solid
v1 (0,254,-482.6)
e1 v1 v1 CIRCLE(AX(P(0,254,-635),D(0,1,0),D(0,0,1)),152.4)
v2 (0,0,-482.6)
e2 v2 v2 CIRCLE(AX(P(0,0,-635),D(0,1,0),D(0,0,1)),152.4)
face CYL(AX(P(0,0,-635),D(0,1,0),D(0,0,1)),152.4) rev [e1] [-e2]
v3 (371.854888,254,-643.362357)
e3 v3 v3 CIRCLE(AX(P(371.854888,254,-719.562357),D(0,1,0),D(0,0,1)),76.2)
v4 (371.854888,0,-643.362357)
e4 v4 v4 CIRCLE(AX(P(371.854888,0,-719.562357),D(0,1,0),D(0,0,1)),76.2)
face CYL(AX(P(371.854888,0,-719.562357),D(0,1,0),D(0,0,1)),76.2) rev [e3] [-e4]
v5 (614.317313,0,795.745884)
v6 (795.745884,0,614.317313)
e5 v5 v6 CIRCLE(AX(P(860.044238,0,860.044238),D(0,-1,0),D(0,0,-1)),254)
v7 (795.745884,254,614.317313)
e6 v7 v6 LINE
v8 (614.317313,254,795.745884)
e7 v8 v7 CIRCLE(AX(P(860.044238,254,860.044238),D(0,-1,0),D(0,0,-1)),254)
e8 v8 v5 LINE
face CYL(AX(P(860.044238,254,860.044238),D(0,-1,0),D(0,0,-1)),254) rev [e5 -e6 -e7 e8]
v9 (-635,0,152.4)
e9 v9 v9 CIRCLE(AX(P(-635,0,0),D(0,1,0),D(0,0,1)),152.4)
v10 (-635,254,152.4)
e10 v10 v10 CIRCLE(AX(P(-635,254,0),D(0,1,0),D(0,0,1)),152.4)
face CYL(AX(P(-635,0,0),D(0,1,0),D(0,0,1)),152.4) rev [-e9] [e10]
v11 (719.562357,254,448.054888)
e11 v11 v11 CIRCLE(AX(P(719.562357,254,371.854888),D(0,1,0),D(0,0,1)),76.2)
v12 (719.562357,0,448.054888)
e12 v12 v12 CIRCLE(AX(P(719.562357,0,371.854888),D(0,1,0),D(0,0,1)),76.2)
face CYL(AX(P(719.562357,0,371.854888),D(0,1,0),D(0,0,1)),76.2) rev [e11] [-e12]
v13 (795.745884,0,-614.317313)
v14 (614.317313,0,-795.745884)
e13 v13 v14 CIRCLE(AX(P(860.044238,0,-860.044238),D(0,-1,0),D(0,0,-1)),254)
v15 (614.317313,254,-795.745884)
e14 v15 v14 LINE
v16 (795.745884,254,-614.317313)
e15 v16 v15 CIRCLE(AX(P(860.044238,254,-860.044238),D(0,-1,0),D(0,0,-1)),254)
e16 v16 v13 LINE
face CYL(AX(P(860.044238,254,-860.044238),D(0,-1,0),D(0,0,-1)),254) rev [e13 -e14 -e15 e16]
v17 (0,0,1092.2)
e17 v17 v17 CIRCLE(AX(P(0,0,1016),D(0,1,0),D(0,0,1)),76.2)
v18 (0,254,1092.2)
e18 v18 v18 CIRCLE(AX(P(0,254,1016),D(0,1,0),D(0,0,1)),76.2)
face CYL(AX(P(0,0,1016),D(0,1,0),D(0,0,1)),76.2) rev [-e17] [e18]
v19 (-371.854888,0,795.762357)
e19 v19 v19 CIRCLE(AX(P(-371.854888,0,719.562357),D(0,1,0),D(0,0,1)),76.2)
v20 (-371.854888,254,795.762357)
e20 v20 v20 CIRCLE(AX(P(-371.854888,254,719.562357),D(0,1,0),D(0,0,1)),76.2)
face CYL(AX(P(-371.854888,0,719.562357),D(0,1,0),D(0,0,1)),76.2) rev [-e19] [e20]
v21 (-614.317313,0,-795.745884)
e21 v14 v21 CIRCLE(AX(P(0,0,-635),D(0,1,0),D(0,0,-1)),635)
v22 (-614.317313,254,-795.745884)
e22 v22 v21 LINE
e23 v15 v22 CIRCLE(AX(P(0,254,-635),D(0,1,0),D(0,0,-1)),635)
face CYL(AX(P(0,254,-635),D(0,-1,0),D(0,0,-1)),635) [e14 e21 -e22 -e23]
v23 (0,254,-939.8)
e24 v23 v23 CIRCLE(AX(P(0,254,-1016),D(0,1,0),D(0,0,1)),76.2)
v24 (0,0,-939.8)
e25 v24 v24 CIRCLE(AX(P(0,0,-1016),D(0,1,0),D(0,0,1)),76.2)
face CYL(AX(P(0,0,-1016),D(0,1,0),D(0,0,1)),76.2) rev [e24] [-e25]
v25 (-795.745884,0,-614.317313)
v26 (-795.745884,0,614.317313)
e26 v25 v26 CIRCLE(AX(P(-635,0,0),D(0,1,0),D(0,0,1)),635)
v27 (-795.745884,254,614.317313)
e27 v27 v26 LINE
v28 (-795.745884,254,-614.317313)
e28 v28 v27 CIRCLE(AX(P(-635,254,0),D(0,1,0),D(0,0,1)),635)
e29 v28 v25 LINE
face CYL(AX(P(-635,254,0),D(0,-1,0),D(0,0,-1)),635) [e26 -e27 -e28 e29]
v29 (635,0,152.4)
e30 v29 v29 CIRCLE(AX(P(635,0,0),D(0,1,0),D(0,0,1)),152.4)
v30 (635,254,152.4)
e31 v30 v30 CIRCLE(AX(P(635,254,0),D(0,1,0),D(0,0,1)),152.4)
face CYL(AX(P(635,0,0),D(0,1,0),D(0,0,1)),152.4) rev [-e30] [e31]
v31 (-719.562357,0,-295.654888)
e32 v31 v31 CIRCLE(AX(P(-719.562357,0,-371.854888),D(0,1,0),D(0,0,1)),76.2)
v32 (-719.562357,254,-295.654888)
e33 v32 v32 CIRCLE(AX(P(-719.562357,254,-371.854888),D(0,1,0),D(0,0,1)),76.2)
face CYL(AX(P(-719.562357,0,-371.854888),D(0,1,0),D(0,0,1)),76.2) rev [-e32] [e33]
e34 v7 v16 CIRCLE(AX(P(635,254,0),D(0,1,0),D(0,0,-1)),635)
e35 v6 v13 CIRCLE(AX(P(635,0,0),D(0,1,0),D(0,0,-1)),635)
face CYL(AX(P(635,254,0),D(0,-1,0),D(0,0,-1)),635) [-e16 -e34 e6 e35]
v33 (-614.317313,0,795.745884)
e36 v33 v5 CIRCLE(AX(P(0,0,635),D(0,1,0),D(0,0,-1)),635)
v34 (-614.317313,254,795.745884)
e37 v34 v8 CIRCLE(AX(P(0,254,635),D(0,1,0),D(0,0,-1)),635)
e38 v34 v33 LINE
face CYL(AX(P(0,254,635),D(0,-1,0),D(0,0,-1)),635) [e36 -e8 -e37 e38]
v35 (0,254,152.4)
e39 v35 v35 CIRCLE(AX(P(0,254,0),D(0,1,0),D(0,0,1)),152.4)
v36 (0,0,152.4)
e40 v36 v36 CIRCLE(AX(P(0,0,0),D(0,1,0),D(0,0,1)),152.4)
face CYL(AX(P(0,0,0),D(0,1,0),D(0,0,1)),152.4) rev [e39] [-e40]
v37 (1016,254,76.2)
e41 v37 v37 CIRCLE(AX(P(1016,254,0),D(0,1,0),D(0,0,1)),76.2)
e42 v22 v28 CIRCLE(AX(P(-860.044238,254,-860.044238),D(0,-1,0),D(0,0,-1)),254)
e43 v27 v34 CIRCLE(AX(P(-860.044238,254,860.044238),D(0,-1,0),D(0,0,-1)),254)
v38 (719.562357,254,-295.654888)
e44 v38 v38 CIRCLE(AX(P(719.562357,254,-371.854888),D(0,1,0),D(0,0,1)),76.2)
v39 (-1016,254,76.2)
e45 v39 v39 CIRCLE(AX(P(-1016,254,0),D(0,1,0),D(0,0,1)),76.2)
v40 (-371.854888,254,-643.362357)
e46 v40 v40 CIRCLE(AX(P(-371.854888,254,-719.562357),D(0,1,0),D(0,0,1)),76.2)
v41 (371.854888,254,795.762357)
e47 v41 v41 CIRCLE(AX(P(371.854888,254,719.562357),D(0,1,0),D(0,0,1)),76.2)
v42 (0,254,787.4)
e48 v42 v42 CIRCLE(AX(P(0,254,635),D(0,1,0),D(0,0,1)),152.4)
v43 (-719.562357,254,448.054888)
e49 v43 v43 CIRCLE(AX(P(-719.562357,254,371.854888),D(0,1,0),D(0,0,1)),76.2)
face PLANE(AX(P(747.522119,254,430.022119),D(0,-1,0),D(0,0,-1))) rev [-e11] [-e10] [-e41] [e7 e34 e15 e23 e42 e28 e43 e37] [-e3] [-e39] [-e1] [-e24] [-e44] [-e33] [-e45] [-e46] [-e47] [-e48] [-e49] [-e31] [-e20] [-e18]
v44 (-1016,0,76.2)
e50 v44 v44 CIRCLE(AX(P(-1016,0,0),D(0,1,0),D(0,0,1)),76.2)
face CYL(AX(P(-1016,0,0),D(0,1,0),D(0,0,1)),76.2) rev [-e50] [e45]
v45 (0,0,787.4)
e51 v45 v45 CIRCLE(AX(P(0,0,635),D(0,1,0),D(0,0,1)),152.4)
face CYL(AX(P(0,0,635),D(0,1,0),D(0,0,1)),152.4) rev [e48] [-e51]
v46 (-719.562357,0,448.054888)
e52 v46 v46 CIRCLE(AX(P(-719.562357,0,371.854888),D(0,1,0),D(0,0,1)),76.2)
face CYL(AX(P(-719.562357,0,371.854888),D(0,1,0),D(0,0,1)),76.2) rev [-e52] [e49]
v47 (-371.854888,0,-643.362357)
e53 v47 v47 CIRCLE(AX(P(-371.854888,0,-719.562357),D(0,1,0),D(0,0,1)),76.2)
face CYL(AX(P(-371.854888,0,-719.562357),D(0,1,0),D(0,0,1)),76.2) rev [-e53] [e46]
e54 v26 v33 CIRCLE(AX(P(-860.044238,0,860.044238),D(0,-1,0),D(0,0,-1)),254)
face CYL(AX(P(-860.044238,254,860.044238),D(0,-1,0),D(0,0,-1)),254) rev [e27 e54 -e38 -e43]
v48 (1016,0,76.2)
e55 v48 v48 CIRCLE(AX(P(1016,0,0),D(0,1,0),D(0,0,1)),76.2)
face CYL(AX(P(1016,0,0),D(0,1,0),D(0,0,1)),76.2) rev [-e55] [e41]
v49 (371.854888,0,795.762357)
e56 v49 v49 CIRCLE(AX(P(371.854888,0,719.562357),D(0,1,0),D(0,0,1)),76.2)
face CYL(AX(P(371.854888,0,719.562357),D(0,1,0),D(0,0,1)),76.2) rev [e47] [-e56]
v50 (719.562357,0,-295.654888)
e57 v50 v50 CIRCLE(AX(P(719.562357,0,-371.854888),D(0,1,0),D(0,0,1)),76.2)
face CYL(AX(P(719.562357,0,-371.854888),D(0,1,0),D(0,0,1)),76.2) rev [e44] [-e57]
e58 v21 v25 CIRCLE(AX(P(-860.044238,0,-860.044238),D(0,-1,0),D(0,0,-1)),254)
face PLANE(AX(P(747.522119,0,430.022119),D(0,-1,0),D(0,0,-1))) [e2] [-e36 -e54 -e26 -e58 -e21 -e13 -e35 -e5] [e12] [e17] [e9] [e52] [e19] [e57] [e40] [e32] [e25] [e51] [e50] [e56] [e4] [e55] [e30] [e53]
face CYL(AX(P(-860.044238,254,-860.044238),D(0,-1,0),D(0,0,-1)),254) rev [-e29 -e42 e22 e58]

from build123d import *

# Parameters (mm, degrees)
BOSS_EXTRUDE1_DEPTH   = 254
SKETCH7_R             = 76.2
CUT_EXTRUDE2_DEPTH    = 254
CRVPATTERN1_OUTLINE_R = 76.2
CRVPATTERN1_DEPTH     = 254
SKETCH9_R             = 152.4
CUT_EXTRUDE3_DEPTH    = 254
CRVPATTERN2_COUNT     = 4
SKETCH10_R            = 152.4
CUT_EXTRUDE4_DEPTH    = 254


# Read off the part's stored shape, not the designer's step: CrvPattern1
with BuildPart() as part:
    # Sketch1 → Boss-Extrude1 (new body)
    with BuildSketch(Plane(origin=(0, 0, 0), x_dir=(1, 0, 0), z_dir=(0, 1, 0))):
        with BuildLine():
            ThreePointArc((-614.317312734, 795.745884163), (0, 1270), (614.317312734, 795.745884163))
            ThreePointArc((614.317312734, 795.745884163), (680.439115406, 680.439115406), (795.745884163, 614.317312734))
            ThreePointArc((795.745884163, 614.317312734), (1270, 0), (795.745884163, -614.317312734))
            ThreePointArc((795.745884163, -614.317312734), (680.439115406, -680.439115406), (614.317312734, -795.745884163))
            ThreePointArc((614.317312734, -795.745884163), (0, -1270), (-614.317312734, -795.745884163))
            ThreePointArc((-614.317312734, -795.745884163), (-680.439115406, -680.439115406), (-795.745884163, -614.317312734))
            ThreePointArc((-795.745884163, -614.317312734), (-1270, 0), (-795.745884163, 614.317312734))
            ThreePointArc((-795.745884163, 614.317312734), (-680.439115406, 680.439115406), (-614.317312734, 795.745884163))
        make_face()
    extrude(amount=BOSS_EXTRUDE1_DEPTH)

    # Sketch7 → Cut-Extrude2 (cut)
    with BuildSketch(Plane(origin=(0, 254, 0), x_dir=(1, 0, 0), z_dir=(0, 1, 0))):
        with Locations(Location((1016, 0, 0), (0, 0, 270))):
            Circle(SKETCH7_R)
    extrude(amount=-CUT_EXTRUDE2_DEPTH, mode=Mode.SUBTRACT)

    # CrvPattern1 outline → CrvPattern1 (cut)
    with BuildSketch(Plane(origin=(0, 0, 0), x_dir=(1, 0, 0), z_dir=(0, 1, 0))):
        with Locations((719.562357426, 371.854888007)):
            Circle(CRVPATTERN1_OUTLINE_R)
        with Locations((719.562357426, -371.854888007)):
            Circle(CRVPATTERN1_OUTLINE_R)
        with Locations((371.854888007, -719.562357426)):
            Circle(CRVPATTERN1_OUTLINE_R)
        with Locations((0, -1016)):
            Circle(CRVPATTERN1_OUTLINE_R)
        with Locations((-371.854888007, -719.562357426)):
            Circle(CRVPATTERN1_OUTLINE_R)
        with Locations((-719.562357426, -371.854888007)):
            Circle(CRVPATTERN1_OUTLINE_R)
        with Locations((-1016, 0)):
            Circle(CRVPATTERN1_OUTLINE_R)
        with Locations((-719.562357426, 371.854888007)):
            Circle(CRVPATTERN1_OUTLINE_R)
        with Locations((-371.854888007, 719.562357426)):
            Circle(CRVPATTERN1_OUTLINE_R)
        with Locations((0, 1016)):
            Circle(CRVPATTERN1_OUTLINE_R)
        with Locations((371.854888007, 719.562357426)):
            Circle(CRVPATTERN1_OUTLINE_R)
    extrude(amount=CRVPATTERN1_DEPTH, mode=Mode.SUBTRACT)

    # Sketch9 → Cut-Extrude3 (cut)
    with BuildSketch(Plane(origin=(0, 254, 0), x_dir=(1, 0, 0), z_dir=(0, 1, 0))):
        with Locations(Location((0, 635, 0), (0, 0, 270))):
            Circle(SKETCH9_R)
    cut_extrude3 = extrude(amount=-CUT_EXTRUDE3_DEPTH, mode=Mode.SUBTRACT)

    # CrvPattern2: Cut-Extrude3 ×4 about axis
    crvpattern2_axis = Axis((0, 254, 0), (0, 1, 0))
    for i in range(1, CRVPATTERN2_COUNT):
        add(cut_extrude3.rotate(crvpattern2_axis, i * 360 / CRVPATTERN2_COUNT), mode=Mode.SUBTRACT)

    # Sketch10 → Cut-Extrude4 (cut)
    with BuildSketch(Plane(origin=(0, 254, 0), x_dir=(1, 0, 0), z_dir=(0, 1, 0))):
        with Locations(Location((0, 0, 0), (0, 0, 270))):
            Circle(SKETCH10_R)
    extrude(amount=-CUT_EXTRUDE4_DEPTH, mode=Mode.SUBTRACT)


solid = part.part
